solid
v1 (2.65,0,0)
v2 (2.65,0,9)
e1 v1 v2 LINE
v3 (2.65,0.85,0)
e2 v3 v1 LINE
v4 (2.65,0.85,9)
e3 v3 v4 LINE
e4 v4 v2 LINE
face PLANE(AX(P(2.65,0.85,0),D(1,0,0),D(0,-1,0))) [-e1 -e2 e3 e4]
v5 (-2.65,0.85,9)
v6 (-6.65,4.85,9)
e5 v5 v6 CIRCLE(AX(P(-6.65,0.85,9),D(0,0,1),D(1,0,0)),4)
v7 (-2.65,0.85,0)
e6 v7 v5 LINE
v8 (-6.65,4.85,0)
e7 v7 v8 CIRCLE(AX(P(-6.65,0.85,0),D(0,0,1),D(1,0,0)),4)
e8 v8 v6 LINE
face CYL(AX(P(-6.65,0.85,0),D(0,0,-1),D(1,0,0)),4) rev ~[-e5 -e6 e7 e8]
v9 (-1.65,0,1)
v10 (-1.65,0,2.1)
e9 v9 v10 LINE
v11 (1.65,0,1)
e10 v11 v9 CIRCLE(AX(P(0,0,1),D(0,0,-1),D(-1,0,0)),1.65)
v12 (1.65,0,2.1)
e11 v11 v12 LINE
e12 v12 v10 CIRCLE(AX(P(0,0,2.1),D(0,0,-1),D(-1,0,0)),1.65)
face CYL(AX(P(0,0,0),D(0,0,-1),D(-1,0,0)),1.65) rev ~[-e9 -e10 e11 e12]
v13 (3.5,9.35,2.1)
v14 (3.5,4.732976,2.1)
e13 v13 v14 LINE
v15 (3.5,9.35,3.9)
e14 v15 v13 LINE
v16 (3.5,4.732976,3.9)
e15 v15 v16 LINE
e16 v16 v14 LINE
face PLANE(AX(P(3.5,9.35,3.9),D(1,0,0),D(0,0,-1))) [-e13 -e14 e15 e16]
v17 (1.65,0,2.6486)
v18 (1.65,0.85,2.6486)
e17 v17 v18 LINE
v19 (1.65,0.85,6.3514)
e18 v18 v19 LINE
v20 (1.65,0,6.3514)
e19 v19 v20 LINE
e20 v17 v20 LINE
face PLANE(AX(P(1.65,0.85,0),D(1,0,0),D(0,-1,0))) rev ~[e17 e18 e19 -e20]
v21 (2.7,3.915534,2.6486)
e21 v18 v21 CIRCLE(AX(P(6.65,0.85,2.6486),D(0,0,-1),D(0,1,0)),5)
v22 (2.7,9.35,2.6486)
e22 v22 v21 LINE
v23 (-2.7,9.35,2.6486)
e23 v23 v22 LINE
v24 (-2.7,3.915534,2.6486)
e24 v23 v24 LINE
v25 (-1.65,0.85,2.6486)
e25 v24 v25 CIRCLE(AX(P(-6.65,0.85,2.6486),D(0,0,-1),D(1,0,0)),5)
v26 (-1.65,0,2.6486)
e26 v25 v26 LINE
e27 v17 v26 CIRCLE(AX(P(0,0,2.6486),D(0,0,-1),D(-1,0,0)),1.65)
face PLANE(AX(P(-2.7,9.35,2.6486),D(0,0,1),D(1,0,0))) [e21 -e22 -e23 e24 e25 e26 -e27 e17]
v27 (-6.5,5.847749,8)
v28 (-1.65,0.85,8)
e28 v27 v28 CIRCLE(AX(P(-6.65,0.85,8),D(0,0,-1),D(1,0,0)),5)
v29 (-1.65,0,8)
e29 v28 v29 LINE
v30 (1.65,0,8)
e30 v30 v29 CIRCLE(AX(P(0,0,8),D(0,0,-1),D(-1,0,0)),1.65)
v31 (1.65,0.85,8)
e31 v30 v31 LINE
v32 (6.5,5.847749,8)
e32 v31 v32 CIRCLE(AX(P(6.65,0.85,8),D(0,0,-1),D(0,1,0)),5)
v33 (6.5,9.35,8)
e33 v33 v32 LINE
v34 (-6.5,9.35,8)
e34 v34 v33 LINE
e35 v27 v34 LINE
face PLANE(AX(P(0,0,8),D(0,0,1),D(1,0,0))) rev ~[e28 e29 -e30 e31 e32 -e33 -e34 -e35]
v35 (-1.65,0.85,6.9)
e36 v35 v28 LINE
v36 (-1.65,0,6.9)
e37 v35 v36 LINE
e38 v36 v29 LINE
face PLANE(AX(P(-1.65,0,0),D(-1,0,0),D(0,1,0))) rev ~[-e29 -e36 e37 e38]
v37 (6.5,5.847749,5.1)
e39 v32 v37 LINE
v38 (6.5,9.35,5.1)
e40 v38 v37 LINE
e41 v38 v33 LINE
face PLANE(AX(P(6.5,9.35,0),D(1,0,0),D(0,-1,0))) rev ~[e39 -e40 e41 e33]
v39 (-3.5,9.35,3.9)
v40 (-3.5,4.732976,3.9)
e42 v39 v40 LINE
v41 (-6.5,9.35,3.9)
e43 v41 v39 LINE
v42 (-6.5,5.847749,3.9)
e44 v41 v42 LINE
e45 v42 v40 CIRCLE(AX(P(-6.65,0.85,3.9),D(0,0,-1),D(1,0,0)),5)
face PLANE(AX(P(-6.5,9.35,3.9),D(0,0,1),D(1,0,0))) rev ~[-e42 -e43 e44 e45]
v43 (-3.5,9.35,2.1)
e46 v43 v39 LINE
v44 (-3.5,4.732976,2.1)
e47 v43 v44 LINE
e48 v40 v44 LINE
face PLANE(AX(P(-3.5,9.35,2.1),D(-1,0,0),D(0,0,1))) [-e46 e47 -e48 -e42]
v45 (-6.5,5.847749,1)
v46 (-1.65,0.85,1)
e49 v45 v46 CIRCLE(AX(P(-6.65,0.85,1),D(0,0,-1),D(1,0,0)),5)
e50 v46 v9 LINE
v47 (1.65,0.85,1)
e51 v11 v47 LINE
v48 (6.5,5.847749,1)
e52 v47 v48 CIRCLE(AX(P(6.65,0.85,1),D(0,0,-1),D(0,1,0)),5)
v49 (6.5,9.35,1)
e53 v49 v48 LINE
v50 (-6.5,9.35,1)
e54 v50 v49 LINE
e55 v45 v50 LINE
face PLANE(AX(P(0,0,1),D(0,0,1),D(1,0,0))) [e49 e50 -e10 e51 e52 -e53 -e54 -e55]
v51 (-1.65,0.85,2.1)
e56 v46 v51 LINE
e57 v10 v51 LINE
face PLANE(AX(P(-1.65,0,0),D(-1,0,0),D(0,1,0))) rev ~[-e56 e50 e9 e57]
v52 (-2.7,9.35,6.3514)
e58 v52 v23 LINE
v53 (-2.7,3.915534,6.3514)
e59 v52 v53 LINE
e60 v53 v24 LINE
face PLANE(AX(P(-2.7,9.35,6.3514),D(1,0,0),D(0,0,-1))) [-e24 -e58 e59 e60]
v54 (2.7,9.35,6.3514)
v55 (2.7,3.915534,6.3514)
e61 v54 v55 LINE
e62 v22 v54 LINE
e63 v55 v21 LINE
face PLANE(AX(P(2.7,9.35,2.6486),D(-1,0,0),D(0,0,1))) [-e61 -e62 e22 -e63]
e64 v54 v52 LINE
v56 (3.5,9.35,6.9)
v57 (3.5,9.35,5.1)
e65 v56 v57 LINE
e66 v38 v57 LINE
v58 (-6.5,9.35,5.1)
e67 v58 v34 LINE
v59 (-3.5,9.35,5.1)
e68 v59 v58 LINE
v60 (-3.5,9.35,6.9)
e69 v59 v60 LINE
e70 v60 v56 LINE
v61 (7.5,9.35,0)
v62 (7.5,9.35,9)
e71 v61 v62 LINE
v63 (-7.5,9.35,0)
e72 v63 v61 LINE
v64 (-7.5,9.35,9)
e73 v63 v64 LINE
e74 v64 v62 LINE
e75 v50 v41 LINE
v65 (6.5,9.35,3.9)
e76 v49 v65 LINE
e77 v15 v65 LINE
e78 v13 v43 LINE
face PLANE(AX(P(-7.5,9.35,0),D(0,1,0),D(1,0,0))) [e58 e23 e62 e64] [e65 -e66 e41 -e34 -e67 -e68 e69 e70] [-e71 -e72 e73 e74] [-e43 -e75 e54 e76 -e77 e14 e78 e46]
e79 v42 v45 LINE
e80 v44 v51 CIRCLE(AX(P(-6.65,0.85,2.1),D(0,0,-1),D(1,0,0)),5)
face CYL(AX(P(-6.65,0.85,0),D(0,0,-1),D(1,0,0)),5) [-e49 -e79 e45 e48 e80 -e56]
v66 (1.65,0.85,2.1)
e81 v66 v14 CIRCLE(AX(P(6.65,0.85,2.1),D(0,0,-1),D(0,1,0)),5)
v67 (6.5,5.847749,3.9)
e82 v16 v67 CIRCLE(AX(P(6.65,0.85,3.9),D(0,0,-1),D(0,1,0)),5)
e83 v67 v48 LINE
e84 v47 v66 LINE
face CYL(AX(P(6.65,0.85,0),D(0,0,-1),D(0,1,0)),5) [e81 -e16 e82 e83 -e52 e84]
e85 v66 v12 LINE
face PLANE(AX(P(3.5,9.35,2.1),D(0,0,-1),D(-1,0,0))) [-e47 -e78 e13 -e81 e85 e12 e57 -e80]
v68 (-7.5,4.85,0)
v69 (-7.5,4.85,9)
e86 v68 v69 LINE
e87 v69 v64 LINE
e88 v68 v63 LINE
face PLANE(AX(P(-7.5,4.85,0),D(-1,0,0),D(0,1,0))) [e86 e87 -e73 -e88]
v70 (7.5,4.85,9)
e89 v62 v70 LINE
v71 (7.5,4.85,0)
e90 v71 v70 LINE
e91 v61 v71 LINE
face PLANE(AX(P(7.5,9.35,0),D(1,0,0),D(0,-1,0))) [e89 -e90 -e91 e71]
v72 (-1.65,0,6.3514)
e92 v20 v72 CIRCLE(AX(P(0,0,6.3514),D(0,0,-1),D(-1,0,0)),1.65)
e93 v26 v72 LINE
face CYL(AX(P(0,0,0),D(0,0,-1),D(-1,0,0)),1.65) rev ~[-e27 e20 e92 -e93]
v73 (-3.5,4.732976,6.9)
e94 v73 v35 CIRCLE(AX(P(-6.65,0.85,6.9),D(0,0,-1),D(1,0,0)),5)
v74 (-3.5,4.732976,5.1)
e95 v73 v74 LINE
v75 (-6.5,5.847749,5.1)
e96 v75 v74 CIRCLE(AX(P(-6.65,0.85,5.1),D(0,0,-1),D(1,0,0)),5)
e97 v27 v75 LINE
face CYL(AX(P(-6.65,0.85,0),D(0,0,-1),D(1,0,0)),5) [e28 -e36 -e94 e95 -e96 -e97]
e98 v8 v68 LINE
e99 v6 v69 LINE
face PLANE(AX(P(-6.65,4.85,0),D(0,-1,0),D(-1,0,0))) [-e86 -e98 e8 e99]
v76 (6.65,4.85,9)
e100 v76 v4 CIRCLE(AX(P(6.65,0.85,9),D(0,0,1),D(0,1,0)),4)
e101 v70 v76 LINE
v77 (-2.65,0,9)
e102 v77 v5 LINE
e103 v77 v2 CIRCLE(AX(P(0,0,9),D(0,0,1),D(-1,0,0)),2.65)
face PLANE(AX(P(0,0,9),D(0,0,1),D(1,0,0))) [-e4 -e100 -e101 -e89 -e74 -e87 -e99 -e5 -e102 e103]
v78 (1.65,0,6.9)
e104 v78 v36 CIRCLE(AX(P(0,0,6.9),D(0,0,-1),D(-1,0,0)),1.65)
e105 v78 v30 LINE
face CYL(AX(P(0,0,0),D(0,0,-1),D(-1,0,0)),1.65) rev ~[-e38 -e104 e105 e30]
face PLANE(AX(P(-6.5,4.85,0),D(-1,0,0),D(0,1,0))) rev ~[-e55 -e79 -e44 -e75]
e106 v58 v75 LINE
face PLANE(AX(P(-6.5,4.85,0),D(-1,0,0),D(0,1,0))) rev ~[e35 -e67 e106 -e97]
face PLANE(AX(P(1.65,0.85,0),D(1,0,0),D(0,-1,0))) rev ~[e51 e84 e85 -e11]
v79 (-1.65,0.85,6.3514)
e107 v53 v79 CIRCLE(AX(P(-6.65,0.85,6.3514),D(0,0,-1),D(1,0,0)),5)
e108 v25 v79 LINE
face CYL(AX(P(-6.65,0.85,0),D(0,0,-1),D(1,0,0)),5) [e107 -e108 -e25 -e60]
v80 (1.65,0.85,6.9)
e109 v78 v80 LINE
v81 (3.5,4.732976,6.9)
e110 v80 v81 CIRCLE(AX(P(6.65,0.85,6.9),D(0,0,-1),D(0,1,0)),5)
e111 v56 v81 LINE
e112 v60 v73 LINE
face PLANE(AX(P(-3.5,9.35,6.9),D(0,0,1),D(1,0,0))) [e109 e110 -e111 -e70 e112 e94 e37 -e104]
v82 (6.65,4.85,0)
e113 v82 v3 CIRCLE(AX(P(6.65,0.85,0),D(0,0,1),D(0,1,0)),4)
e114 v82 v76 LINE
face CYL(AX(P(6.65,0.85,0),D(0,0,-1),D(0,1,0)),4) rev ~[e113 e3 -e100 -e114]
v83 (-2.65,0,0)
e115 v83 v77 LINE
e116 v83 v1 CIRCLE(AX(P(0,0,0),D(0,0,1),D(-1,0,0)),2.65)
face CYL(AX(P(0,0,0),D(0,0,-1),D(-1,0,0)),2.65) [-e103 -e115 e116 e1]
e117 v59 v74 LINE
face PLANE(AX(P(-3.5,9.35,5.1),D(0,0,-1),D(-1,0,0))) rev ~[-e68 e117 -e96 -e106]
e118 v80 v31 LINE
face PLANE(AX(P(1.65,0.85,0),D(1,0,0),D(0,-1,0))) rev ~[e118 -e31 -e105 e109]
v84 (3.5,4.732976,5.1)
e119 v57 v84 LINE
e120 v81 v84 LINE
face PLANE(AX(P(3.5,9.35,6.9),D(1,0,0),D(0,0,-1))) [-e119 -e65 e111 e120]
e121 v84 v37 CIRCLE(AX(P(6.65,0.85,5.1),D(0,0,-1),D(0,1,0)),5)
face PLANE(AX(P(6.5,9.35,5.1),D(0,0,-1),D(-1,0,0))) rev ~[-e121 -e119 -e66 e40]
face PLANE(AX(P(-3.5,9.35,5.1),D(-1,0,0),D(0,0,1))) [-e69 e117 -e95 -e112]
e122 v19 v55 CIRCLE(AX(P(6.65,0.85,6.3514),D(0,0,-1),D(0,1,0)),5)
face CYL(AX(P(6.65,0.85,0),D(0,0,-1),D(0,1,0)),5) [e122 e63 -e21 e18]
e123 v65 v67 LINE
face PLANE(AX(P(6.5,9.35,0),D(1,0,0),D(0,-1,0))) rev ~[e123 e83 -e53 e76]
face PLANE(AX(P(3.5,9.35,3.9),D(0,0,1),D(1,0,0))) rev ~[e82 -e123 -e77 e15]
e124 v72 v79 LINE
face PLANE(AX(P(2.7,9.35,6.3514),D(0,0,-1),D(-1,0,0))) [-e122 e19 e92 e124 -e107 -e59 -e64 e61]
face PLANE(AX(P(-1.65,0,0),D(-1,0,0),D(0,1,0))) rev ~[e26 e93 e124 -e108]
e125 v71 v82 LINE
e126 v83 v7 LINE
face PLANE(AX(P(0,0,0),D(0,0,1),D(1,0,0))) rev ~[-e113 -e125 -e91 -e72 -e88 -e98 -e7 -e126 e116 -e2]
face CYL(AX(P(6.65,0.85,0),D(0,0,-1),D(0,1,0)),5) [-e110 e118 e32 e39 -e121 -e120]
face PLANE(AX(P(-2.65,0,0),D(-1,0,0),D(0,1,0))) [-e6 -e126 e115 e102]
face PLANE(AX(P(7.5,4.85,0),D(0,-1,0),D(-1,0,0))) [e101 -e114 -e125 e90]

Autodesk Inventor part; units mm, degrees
ref_plane "YZ Plane" through (0, 0, 0) normal (1, 0, 0) x (0, 1, 0)
ref_plane "XZ Plane" through (0, 0, 0) normal (0, 1, 0) x (-1, 0, 0)
ref_plane "XY Plane" through (0, 0, 0) normal (0, 0, 1) x (1, 0, 0)
sketch "Sketch1" plane through (0, 0, 0) normal (0, 0, 1) x (1, 0, 0)
  arc A0 (-2.65, 0) -> (2.65, 0) centre (0, 0) ccw
  line L0 (-7.5, 9.35) -> (7.5, 9.35)
  line L1 (7.5, 9.35) -> (7.5, 4.85)
  line L2 (-7.5, 4.85) -> (-7.5, 9.35)
  line L3 (-2.65, 0) -> (-2.65, 0.85)
  line L4 (2.65, 0.85) -> (2.65, 0)
  line L5 (7.5, 4.85) -> (6.65, 4.85)
  line L6 (-6.65, 4.85) -> (-7.5, 4.85)
  line L7 (0, 0) -> (0, 9.35) construction
  arc A1 (-2.65, 0.85) -> (-6.65, 4.85) centre (-6.65, 0.85) ccw
  arc A2 (6.65, 4.85) -> (2.65, 0.85) centre (6.65, 0.85) ccw
  dimension "d0" = 2.65
  dimension "d1" = 4.5
  dimension "d2" = 15
  dimension "d3" = 12
  dimension "d4" = 4
extrude "Extrusion1" add sketch "Sketch1" along normal blind 9
shell "Shell1" thickness 1 removed faces 1 at (-2.5, 9.35, 3)
sketch "Sketch3" plane through (-7.5, 9.35, 0) normal (0, 1, 0) x (1, 0, 0)
  line L0 (1, -5.1) -> (1, -3.9)
  line L1 (14, -3.9) -> (14, -5.1)
  line L2 (11, -2.1) -> (4, -2.1)
  line L3 (4, -6.9) -> (11, -6.9)
  line L4 (11, -2.1) -> (4, -6.9) construction
  line L5 (4, -2.1) -> (11, -6.9) construction
  line L6 (14, -5.1) -> (11, -5.1)
  line L7 (4, -5.1) -> (1, -5.1)
  line L8 (1, -3.9) -> (4, -3.9)
  line L9 (11, -3.9) -> (14, -3.9)
  line L10 (4, -2.1) -> (4, -3.9)
  line L11 (4, -5.1) -> (4, -6.9)
  line L12 (11, -6.9) -> (11, -5.1)
  line L13 (11, -3.9) -> (11, -2.1)
  line L14 (14, -1) -> (14, -8) projected
  line L15 (1, -8) -> (1, -1) projected
  line L16 (14, -8) -> (1, -8) projected
  line L17 (7.5, -8) -> (7.5, -4.5) construction
  line L18 (1, -1) -> (14, -1) projected
  line L19 (7.5, -1) -> (7.5, -4.5) construction
  line L20 (4.8, -2.6486) -> (10.2, -2.6486)
  line L21 (10.2, -2.6486) -> (10.2, -6.3514)
  line L22 (10.2, -6.3514) -> (4.8, -6.3514)
  line L23 (4.8, -6.3514) -> (4.8, -2.6486)
  line L24 (4.8, -2.6486) -> (10.2, -6.3514) construction
  line L25 (10.2, -2.6486) -> (4.8, -6.3514) construction
  point P0 (7.5, 0)
  dimension "d8" = 1.2
  dimension "d9" = 7
  dimension "d10" = 4.8
  dimension "d11" = 0.8
extrude "Extrusion2" add sketch "Sketch3" against normal up to next contours L0 L8 L10 L2 L13 L9 L1 L6 L12 L3 L11 L7
properties part number "Boton de temperaturas" material "ABS Plastic"
